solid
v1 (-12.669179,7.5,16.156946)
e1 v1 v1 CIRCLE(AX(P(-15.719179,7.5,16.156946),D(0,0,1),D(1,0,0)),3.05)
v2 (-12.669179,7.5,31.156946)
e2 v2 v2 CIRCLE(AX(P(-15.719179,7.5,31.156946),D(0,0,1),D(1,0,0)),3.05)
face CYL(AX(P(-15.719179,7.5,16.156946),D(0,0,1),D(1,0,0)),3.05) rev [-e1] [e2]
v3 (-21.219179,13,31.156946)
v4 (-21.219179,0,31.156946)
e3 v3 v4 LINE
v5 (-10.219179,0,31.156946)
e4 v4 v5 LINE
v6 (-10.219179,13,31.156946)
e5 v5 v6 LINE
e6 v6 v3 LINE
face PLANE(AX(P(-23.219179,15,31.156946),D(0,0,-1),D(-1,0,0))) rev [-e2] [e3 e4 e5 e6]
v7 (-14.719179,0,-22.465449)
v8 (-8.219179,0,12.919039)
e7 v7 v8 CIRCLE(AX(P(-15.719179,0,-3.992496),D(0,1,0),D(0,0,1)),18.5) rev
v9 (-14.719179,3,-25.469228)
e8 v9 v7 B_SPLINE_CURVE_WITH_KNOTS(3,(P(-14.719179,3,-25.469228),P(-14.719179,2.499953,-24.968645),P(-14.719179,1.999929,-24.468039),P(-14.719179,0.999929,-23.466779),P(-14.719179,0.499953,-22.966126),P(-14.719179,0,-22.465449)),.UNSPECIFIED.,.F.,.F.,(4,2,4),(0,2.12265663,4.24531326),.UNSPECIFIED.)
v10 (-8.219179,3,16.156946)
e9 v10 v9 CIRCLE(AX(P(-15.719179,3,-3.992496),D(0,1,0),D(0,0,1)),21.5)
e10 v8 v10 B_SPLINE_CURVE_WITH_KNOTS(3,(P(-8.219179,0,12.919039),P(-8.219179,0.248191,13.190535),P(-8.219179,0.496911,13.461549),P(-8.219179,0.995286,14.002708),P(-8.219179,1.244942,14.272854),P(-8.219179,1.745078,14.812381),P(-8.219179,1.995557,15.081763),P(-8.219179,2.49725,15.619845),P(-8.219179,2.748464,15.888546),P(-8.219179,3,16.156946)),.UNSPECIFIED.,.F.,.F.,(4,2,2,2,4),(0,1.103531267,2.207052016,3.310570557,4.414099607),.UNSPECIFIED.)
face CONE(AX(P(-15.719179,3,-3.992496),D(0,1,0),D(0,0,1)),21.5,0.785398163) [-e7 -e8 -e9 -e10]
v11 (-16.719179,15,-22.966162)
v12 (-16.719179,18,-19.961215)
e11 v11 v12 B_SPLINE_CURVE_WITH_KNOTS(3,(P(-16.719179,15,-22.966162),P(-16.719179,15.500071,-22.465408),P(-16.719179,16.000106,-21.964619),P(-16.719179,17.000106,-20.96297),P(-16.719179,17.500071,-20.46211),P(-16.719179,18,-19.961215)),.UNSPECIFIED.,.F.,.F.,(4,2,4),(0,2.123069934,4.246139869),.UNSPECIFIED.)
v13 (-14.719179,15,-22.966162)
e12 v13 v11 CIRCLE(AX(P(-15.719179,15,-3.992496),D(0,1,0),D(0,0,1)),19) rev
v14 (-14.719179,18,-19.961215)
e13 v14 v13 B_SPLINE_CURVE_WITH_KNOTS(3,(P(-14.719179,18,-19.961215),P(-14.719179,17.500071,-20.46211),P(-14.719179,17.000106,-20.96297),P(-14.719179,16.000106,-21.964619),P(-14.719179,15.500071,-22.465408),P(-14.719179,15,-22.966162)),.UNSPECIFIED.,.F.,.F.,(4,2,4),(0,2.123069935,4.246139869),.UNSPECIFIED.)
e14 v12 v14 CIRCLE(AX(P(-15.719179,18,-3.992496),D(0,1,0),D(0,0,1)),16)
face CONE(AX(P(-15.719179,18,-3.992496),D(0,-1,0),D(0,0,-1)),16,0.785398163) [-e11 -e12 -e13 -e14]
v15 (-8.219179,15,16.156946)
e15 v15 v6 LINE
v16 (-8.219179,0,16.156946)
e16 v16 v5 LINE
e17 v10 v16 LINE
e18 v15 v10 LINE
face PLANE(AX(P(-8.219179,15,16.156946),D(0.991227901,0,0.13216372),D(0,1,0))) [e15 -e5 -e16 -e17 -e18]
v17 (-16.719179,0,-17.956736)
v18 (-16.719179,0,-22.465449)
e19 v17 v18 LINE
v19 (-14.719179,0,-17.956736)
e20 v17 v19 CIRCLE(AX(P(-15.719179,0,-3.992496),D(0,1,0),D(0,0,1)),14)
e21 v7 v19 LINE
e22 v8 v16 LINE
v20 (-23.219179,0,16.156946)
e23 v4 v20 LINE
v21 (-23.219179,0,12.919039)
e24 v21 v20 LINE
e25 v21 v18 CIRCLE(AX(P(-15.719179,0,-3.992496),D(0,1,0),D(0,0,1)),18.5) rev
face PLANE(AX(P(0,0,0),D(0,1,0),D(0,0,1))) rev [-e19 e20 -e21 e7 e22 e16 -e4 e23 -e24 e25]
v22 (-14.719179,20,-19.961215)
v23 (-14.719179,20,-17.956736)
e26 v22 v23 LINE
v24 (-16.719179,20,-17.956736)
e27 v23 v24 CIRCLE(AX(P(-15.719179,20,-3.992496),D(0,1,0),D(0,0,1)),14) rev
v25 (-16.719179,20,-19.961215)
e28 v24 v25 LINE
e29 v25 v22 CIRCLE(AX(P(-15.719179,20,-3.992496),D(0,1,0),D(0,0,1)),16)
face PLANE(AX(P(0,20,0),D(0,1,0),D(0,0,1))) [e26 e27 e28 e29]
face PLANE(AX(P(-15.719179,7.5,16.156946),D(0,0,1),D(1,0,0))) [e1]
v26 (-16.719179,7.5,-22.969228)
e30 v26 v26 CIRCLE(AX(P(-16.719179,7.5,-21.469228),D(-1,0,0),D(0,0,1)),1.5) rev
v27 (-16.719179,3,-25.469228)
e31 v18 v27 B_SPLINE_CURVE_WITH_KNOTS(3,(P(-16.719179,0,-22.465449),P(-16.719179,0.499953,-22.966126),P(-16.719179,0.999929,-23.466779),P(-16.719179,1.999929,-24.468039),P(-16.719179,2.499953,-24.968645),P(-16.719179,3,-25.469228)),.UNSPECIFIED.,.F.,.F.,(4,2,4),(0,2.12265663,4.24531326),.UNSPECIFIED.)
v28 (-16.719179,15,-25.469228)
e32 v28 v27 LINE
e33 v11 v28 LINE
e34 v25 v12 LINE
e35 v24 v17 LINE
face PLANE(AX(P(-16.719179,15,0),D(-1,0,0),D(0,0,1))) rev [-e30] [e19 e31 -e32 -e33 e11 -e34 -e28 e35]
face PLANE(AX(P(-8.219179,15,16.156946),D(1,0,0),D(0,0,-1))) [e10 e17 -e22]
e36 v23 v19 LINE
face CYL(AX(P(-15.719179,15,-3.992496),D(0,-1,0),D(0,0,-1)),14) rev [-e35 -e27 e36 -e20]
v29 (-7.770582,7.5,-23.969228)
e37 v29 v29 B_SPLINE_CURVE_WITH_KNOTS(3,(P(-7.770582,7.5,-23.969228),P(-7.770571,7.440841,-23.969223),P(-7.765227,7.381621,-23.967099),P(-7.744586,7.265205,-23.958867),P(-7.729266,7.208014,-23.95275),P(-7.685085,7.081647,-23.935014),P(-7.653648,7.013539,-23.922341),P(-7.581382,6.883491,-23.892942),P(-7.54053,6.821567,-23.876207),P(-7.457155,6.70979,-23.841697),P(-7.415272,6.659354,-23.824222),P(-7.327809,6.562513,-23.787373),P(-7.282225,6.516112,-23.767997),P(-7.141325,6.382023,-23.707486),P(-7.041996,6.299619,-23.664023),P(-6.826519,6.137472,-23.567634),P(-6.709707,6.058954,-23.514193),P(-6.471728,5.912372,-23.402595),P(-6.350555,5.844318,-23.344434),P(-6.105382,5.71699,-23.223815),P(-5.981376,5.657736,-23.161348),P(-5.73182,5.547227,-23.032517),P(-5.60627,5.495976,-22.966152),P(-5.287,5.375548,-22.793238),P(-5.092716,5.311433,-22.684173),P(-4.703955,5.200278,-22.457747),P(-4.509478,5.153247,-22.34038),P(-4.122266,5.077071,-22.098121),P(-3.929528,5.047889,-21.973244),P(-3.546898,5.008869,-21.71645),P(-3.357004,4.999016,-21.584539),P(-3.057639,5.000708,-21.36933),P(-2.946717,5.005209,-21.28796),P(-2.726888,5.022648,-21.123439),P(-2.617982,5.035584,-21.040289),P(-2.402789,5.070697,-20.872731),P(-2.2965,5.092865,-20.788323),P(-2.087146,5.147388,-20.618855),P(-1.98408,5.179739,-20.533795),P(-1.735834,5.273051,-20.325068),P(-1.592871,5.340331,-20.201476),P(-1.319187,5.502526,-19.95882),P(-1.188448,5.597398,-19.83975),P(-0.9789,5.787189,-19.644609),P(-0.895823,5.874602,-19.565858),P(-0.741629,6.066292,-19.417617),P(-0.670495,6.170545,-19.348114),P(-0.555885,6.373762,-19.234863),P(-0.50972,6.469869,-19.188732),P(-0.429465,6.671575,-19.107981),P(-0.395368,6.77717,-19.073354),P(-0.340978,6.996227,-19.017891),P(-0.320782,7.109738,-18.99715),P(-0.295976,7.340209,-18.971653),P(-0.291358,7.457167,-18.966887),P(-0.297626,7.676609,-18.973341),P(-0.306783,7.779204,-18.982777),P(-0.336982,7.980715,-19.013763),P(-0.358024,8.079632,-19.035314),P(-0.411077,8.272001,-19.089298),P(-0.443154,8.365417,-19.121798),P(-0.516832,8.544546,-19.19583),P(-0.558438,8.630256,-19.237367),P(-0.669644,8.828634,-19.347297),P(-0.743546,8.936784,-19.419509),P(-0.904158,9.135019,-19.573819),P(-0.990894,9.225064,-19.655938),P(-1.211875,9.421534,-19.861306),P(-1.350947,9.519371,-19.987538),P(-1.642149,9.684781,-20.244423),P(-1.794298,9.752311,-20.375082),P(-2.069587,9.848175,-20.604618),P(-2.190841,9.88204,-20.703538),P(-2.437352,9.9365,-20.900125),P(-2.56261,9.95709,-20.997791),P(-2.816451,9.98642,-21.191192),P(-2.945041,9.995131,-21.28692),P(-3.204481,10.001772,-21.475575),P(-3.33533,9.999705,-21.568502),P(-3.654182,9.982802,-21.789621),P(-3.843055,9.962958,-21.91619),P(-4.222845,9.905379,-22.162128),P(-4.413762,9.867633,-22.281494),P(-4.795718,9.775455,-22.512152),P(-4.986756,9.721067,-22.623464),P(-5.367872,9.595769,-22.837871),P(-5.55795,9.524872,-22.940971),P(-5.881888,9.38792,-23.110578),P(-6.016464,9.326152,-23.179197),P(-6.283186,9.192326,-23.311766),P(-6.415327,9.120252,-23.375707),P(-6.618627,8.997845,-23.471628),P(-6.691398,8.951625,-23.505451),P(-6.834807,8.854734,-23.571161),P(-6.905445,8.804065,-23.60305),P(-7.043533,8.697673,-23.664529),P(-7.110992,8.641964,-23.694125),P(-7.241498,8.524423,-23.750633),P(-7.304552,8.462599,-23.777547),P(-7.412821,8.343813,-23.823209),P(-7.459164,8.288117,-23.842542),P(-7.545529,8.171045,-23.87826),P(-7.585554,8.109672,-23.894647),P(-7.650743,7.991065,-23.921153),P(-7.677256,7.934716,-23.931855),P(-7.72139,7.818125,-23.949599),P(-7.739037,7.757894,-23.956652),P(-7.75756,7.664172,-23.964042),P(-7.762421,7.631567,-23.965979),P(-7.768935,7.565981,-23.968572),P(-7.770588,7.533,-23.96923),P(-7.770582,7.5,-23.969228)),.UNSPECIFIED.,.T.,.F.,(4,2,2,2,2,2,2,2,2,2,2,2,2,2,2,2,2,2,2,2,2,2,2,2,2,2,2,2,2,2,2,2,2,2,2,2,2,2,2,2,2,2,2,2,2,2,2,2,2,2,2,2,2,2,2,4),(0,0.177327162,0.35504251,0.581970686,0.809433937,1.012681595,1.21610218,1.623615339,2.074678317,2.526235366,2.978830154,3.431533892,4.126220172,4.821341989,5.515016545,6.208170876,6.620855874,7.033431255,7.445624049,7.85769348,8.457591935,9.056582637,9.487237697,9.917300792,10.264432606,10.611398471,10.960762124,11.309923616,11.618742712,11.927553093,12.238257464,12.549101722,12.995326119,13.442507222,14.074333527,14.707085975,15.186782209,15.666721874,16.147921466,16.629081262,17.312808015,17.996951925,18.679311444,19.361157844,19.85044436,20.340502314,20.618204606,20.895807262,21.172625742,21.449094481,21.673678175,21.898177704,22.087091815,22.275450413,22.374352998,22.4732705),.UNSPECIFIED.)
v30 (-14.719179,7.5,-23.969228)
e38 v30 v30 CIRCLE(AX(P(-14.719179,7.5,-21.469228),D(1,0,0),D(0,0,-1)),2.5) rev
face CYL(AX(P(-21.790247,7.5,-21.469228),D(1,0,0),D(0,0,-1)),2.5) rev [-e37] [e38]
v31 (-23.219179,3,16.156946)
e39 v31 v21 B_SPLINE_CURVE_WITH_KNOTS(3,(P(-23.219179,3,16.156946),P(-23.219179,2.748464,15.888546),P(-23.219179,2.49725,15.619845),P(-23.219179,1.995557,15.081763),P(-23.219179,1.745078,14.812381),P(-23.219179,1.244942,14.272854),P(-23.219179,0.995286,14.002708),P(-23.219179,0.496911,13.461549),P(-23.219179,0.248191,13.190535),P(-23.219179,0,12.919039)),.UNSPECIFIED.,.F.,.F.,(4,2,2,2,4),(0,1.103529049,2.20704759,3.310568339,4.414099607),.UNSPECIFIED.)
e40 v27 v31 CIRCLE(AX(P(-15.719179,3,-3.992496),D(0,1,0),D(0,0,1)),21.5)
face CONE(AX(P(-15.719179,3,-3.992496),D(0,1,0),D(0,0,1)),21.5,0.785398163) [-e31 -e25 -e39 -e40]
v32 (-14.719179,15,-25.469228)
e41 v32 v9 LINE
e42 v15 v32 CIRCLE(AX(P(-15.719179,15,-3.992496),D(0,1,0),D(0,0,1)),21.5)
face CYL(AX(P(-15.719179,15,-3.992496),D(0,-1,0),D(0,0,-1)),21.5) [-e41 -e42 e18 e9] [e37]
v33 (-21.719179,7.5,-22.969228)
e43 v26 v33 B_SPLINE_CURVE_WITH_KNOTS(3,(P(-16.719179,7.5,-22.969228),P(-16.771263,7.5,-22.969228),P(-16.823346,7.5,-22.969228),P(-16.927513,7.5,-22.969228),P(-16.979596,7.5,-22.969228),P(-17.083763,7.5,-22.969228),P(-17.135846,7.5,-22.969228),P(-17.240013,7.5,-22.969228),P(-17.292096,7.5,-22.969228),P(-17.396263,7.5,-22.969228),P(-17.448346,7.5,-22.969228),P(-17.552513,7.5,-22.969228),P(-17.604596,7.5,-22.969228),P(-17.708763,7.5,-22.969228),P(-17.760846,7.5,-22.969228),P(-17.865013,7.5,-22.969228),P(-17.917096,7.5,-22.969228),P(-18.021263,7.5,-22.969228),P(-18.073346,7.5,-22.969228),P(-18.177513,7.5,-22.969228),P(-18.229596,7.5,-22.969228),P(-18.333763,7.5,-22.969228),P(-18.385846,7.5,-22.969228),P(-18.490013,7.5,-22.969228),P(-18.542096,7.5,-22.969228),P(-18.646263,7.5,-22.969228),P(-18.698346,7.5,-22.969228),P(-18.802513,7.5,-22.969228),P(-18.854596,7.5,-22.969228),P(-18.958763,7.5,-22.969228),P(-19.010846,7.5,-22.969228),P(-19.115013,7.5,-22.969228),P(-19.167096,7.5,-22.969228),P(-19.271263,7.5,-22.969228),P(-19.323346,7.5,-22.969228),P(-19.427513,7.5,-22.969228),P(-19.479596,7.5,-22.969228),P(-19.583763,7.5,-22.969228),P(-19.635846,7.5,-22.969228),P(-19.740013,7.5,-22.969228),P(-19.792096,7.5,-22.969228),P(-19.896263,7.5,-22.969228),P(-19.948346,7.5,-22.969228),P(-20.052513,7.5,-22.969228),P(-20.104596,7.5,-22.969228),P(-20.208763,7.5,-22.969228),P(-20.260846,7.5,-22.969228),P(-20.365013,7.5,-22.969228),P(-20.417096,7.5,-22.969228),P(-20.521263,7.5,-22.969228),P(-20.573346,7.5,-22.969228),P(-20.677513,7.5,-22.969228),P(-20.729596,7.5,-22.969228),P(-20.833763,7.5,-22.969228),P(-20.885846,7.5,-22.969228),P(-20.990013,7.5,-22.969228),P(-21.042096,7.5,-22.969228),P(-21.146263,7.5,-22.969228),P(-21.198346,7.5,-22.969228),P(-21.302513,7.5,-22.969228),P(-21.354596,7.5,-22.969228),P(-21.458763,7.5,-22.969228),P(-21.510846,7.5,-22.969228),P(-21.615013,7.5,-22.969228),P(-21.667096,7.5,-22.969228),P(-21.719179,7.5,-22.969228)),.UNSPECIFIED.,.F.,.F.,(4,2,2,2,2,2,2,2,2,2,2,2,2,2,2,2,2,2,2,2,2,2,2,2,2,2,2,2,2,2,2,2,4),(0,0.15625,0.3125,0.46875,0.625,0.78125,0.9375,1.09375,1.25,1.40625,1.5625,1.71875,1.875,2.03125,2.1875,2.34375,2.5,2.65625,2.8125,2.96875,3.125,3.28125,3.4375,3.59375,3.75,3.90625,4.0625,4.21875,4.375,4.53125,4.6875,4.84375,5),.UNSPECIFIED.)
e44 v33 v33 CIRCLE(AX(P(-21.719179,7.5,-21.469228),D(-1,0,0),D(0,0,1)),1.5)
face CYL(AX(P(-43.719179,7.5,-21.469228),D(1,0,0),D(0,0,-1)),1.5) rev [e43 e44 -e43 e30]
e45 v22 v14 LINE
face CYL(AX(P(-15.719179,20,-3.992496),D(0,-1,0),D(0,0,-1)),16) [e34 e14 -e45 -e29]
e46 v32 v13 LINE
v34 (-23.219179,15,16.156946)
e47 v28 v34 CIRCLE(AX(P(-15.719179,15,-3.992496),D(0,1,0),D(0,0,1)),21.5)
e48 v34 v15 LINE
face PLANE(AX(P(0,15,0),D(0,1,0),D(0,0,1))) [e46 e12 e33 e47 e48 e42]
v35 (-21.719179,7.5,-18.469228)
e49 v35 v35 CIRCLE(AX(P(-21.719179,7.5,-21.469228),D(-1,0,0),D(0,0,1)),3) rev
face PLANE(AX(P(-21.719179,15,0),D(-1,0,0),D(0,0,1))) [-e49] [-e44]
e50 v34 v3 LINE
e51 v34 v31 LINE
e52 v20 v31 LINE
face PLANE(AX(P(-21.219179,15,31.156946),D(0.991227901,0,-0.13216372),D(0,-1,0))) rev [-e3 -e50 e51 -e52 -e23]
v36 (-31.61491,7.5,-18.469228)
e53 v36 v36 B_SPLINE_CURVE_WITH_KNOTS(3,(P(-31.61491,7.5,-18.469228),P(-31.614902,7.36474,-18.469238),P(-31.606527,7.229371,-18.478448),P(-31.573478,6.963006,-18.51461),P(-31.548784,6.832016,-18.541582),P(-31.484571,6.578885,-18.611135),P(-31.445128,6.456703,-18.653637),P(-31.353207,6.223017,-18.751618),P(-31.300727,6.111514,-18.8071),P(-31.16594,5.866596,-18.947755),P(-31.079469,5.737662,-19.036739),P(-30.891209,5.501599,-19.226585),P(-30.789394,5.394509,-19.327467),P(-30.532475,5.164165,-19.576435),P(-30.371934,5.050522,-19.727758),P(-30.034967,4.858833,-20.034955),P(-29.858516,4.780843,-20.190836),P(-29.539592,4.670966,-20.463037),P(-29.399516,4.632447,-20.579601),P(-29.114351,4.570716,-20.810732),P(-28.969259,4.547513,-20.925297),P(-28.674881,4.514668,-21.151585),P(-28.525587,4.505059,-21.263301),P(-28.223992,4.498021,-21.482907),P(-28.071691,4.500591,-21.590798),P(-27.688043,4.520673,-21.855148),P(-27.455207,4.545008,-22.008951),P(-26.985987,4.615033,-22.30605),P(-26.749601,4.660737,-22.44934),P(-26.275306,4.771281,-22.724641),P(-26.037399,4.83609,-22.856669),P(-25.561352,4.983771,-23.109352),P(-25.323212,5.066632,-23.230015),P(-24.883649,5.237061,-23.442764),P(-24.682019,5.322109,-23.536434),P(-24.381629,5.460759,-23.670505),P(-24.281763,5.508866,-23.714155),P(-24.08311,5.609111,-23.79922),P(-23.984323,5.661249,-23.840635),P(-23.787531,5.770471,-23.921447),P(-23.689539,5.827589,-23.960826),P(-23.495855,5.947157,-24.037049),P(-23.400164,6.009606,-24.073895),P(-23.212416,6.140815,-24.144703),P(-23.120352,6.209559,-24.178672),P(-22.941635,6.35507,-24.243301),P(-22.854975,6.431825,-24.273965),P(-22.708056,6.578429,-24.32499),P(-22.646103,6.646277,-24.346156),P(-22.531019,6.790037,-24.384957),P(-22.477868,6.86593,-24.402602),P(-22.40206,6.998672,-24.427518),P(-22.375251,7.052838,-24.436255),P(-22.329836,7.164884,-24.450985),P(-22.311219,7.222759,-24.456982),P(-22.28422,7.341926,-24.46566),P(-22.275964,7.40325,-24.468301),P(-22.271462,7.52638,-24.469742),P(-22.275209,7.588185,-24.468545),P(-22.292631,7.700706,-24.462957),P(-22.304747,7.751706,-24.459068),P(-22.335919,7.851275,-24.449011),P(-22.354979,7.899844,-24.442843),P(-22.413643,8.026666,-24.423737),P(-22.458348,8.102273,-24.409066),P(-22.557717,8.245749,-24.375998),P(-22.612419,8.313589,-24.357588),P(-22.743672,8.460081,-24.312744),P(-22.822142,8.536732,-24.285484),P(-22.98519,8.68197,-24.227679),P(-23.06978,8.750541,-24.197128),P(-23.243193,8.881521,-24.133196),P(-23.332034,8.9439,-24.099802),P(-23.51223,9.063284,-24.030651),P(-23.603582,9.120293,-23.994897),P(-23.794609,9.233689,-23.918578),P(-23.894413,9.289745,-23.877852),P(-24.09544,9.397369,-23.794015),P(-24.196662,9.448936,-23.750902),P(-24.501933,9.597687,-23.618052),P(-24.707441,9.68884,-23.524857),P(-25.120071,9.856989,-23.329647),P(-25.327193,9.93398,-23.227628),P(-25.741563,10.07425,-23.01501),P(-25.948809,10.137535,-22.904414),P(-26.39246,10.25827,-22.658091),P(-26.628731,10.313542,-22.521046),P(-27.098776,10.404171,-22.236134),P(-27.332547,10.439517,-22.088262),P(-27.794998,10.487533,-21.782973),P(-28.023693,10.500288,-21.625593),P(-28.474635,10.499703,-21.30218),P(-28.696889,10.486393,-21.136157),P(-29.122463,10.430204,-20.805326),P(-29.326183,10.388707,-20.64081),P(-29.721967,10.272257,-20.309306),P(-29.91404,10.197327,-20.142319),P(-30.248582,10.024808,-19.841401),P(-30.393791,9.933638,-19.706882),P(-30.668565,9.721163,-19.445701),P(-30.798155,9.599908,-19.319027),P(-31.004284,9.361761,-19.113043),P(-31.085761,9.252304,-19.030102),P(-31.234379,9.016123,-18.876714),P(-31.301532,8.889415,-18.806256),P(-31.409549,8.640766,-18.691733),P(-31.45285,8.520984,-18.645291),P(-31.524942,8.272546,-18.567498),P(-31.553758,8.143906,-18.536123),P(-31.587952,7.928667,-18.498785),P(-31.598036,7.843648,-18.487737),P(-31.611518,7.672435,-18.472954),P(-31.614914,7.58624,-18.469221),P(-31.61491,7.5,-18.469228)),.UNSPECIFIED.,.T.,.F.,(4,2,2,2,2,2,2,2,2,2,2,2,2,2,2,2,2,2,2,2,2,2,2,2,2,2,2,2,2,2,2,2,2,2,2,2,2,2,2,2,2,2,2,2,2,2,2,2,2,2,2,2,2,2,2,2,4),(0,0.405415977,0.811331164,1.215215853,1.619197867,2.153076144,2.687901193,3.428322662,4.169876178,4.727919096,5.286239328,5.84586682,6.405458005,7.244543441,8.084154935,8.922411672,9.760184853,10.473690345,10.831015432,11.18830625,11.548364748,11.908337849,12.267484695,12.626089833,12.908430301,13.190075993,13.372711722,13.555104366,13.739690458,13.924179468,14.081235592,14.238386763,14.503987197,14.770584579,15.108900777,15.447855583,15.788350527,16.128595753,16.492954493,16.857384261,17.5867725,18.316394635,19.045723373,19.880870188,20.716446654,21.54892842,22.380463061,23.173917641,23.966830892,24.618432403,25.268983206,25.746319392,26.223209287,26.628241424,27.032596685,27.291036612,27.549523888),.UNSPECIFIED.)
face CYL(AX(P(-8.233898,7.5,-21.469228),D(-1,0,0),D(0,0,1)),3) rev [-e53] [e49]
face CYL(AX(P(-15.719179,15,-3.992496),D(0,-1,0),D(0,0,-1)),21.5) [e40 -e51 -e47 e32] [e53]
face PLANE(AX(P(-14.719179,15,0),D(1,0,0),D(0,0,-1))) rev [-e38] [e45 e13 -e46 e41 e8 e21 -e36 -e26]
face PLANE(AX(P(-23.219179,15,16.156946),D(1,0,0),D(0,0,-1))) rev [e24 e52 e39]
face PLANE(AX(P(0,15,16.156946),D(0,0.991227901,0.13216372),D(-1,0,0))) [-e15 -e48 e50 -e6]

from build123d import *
from OCP.BRepFilletAPI import BRepFilletAPI_MakeChamfer

# Parameters (mm, degrees)
BOSS_EXTRUDE1_DEPTH     = 15
SKETCH2_R               = 3.05
CUT_EXTRUDE1_DEPTH      = 15
BOSS_EXTRUDE2_DEPTH     = 5
CHAMFER4_SIZE           = 3
CHAMFER6_SIZE           = 15
CHAMFER6_SIZE_2         = 2
CUT_EXTRUDE2_DEPTH      = 29
CUT_EXTRUDE2_DEPTH_BACK = 25
SKETCH4_R               = 1.5
SKETCH5_R               = 2.5
CUT_EXTRUDE3_DEPTH      = 20.5
SKETCH6_R               = 3
CUT_EXTRUDE4_DEPTH      = 15.5


with BuildPart() as part:
    # Sketch1 → Boss-Extrude1 (new body)
    with BuildSketch(Plane(origin=(0, 0, 0), x_dir=(1, 0, 0), z_dir=(0, 1, 0))):
        with BuildLine():
            ThreePointArc((-14.719179189, 17.95673597), (-15.719179189, -10.007504074), (-16.719179189, 17.95673597))
            Line((-16.719179189, 17.95673597), (-16.719179189, 25.469227521))
            ThreePointArc((-16.719179189, 25.469227521), (-36.961756137, 7.309561592), (-23.219179189, -16.156945753))
            Line((-23.219179189, -16.156945753), (-23.219179189, -31.156945753))
            Line((-23.219179189, -31.156945753), (-8.219179189, -31.156945753))
            Line((-8.219179189, -31.156945753), (-8.219179189, -16.156945753))
            ThreePointArc((-8.219179189, -16.156945753), (5.523397758, 7.309561592), (-14.719179189, 25.469227521))
            Line((-14.719179189, 25.469227521), (-14.719179189, 17.95673597))
        make_face()
    extrude(amount=BOSS_EXTRUDE1_DEPTH)

    # Sketch2 → Cut-Extrude1 (cut)
    with BuildSketch(Plane.XY.offset(31.156945753)):
        with Locations((-15.719179189, 7.5)):
            Circle(SKETCH2_R)
    extrude(amount=-CUT_EXTRUDE1_DEPTH, mode=Mode.SUBTRACT)

    # Sketch3 → Boss-Extrude2 (add)
    with BuildSketch(Plane(origin=(0, 15, 0), x_dir=(1, 0, 0), z_dir=(0, 1, 0))):
        with BuildLine():
            Line((-16.719179189, 17.95673597), (-16.719179189, 19.961215349))
            ThreePointArc((-16.719179189, 19.961215349), (-26.673630339, -7.669407863), (0.280820811, 3.992495926))
            ThreePointArc((0.280820811, 3.992495926), (-4.0572754, 14.946947076), (-14.719179189, 19.961215349))
            Line((-14.719179189, 19.961215349), (-14.719179189, 17.95673597))
            ThreePointArc((-14.719179189, 17.95673597), (-15.719179189, -10.007504074), (-16.719179189, 17.95673597))
        make_face()
    extrude(amount=BOSS_EXTRUDE2_DEPTH)

    # Chamfer4
    chamfer4_edges = [part.edges().sort_by_distance(p)[0] for p in [
        (-26.673630339, 15, 7.669407863),
        (-36.961756137, 0, -7.309561592),
        (5.523397758, 0, -7.309561592),
    ]]
    chamfer(chamfer4_edges, length=CHAMFER4_SIZE)

    # Chamfer6
    chamfer6_edges_1 = [part.edges().sort_by_distance(p)[0] for p in [
        (-23.219179189, 7.5, 31.156945753),
    ]]
    chamfer6_side_1 = [part.faces().sort_by_distance(p)[0] for p in [
        (-23.219179189, 7.5, 31.116945753),
    ]]
    chamfer6_edges_2 = [part.edges().sort_by_distance(p)[0] for p in [
        (-8.219179189, 7.5, 31.156945753),
    ]]
    chamfer6_side_2 = [part.faces().sort_by_distance(p)[0] for p in [
        (-8.259179189, 7.5, 31.156945753),
    ]]
    chamfer6_edges_3 = [part.edges().sort_by_distance(p)[0] for p in [
        (-15.719179189, 15, 31.156945753),
    ]]
    chamfer6_side_3 = [part.faces().sort_by_distance(p)[0] for p in [
        (-15.719179189, 14.96, 31.156945753),
    ]]
    chamfer6 = BRepFilletAPI_MakeChamfer(part.part.solid().wrapped)
    for e in chamfer6_edges_1:
        chamfer6.Add(CHAMFER6_SIZE - 0.0001, CHAMFER6_SIZE_2 - 0.0001, e.wrapped, chamfer6_side_1[0].wrapped)
    for e in chamfer6_edges_2:
        chamfer6.Add(CHAMFER6_SIZE_2 - 0.0001, CHAMFER6_SIZE - 0.0001, e.wrapped, chamfer6_side_2[0].wrapped)
    for e in chamfer6_edges_3:
        chamfer6.Add(CHAMFER6_SIZE_2 - 0.0001, CHAMFER6_SIZE - 0.0001, e.wrapped, chamfer6_side_3[0].wrapped)
    add(Compound.cast(chamfer6.Shape()), mode=Mode.REPLACE)  # a hair under: the kernel refuses the full size

    # Sketch4 → Cut-Extrude2 (cut, two sides: drawn at the far end of the back side and taken through both)
    with BuildSketch(Plane.ZY.offset(14.719179189).offset(-CUT_EXTRUDE2_DEPTH_BACK)):
        with Locations(Location((-21.469227521, 7.5, 0), (0, 0, 180))):
            Circle(SKETCH4_R)
    extrude(amount=CUT_EXTRUDE2_DEPTH + CUT_EXTRUDE2_DEPTH_BACK, mode=Mode.SUBTRACT)

    # Sketch5 → Cut-Extrude3 (cut)
    with BuildSketch(Plane(origin=(5.780820811, 0, 0), x_dir=(0, 0, -1), z_dir=(1, 0, 0))):
        with Locations((21.469227521, 7.5)):
            Circle(SKETCH5_R)
    extrude(amount=-CUT_EXTRUDE3_DEPTH, mode=Mode.SUBTRACT)

    # Sketch6 → Cut-Extrude4 (cut)
    with BuildSketch(Plane.ZY.offset(37.219179189)):
        with Locations((-21.469227521, 7.5)):
            Circle(SKETCH6_R)
    extrude(amount=-CUT_EXTRUDE4_DEPTH, mode=Mode.SUBTRACT)


solid = part.part
